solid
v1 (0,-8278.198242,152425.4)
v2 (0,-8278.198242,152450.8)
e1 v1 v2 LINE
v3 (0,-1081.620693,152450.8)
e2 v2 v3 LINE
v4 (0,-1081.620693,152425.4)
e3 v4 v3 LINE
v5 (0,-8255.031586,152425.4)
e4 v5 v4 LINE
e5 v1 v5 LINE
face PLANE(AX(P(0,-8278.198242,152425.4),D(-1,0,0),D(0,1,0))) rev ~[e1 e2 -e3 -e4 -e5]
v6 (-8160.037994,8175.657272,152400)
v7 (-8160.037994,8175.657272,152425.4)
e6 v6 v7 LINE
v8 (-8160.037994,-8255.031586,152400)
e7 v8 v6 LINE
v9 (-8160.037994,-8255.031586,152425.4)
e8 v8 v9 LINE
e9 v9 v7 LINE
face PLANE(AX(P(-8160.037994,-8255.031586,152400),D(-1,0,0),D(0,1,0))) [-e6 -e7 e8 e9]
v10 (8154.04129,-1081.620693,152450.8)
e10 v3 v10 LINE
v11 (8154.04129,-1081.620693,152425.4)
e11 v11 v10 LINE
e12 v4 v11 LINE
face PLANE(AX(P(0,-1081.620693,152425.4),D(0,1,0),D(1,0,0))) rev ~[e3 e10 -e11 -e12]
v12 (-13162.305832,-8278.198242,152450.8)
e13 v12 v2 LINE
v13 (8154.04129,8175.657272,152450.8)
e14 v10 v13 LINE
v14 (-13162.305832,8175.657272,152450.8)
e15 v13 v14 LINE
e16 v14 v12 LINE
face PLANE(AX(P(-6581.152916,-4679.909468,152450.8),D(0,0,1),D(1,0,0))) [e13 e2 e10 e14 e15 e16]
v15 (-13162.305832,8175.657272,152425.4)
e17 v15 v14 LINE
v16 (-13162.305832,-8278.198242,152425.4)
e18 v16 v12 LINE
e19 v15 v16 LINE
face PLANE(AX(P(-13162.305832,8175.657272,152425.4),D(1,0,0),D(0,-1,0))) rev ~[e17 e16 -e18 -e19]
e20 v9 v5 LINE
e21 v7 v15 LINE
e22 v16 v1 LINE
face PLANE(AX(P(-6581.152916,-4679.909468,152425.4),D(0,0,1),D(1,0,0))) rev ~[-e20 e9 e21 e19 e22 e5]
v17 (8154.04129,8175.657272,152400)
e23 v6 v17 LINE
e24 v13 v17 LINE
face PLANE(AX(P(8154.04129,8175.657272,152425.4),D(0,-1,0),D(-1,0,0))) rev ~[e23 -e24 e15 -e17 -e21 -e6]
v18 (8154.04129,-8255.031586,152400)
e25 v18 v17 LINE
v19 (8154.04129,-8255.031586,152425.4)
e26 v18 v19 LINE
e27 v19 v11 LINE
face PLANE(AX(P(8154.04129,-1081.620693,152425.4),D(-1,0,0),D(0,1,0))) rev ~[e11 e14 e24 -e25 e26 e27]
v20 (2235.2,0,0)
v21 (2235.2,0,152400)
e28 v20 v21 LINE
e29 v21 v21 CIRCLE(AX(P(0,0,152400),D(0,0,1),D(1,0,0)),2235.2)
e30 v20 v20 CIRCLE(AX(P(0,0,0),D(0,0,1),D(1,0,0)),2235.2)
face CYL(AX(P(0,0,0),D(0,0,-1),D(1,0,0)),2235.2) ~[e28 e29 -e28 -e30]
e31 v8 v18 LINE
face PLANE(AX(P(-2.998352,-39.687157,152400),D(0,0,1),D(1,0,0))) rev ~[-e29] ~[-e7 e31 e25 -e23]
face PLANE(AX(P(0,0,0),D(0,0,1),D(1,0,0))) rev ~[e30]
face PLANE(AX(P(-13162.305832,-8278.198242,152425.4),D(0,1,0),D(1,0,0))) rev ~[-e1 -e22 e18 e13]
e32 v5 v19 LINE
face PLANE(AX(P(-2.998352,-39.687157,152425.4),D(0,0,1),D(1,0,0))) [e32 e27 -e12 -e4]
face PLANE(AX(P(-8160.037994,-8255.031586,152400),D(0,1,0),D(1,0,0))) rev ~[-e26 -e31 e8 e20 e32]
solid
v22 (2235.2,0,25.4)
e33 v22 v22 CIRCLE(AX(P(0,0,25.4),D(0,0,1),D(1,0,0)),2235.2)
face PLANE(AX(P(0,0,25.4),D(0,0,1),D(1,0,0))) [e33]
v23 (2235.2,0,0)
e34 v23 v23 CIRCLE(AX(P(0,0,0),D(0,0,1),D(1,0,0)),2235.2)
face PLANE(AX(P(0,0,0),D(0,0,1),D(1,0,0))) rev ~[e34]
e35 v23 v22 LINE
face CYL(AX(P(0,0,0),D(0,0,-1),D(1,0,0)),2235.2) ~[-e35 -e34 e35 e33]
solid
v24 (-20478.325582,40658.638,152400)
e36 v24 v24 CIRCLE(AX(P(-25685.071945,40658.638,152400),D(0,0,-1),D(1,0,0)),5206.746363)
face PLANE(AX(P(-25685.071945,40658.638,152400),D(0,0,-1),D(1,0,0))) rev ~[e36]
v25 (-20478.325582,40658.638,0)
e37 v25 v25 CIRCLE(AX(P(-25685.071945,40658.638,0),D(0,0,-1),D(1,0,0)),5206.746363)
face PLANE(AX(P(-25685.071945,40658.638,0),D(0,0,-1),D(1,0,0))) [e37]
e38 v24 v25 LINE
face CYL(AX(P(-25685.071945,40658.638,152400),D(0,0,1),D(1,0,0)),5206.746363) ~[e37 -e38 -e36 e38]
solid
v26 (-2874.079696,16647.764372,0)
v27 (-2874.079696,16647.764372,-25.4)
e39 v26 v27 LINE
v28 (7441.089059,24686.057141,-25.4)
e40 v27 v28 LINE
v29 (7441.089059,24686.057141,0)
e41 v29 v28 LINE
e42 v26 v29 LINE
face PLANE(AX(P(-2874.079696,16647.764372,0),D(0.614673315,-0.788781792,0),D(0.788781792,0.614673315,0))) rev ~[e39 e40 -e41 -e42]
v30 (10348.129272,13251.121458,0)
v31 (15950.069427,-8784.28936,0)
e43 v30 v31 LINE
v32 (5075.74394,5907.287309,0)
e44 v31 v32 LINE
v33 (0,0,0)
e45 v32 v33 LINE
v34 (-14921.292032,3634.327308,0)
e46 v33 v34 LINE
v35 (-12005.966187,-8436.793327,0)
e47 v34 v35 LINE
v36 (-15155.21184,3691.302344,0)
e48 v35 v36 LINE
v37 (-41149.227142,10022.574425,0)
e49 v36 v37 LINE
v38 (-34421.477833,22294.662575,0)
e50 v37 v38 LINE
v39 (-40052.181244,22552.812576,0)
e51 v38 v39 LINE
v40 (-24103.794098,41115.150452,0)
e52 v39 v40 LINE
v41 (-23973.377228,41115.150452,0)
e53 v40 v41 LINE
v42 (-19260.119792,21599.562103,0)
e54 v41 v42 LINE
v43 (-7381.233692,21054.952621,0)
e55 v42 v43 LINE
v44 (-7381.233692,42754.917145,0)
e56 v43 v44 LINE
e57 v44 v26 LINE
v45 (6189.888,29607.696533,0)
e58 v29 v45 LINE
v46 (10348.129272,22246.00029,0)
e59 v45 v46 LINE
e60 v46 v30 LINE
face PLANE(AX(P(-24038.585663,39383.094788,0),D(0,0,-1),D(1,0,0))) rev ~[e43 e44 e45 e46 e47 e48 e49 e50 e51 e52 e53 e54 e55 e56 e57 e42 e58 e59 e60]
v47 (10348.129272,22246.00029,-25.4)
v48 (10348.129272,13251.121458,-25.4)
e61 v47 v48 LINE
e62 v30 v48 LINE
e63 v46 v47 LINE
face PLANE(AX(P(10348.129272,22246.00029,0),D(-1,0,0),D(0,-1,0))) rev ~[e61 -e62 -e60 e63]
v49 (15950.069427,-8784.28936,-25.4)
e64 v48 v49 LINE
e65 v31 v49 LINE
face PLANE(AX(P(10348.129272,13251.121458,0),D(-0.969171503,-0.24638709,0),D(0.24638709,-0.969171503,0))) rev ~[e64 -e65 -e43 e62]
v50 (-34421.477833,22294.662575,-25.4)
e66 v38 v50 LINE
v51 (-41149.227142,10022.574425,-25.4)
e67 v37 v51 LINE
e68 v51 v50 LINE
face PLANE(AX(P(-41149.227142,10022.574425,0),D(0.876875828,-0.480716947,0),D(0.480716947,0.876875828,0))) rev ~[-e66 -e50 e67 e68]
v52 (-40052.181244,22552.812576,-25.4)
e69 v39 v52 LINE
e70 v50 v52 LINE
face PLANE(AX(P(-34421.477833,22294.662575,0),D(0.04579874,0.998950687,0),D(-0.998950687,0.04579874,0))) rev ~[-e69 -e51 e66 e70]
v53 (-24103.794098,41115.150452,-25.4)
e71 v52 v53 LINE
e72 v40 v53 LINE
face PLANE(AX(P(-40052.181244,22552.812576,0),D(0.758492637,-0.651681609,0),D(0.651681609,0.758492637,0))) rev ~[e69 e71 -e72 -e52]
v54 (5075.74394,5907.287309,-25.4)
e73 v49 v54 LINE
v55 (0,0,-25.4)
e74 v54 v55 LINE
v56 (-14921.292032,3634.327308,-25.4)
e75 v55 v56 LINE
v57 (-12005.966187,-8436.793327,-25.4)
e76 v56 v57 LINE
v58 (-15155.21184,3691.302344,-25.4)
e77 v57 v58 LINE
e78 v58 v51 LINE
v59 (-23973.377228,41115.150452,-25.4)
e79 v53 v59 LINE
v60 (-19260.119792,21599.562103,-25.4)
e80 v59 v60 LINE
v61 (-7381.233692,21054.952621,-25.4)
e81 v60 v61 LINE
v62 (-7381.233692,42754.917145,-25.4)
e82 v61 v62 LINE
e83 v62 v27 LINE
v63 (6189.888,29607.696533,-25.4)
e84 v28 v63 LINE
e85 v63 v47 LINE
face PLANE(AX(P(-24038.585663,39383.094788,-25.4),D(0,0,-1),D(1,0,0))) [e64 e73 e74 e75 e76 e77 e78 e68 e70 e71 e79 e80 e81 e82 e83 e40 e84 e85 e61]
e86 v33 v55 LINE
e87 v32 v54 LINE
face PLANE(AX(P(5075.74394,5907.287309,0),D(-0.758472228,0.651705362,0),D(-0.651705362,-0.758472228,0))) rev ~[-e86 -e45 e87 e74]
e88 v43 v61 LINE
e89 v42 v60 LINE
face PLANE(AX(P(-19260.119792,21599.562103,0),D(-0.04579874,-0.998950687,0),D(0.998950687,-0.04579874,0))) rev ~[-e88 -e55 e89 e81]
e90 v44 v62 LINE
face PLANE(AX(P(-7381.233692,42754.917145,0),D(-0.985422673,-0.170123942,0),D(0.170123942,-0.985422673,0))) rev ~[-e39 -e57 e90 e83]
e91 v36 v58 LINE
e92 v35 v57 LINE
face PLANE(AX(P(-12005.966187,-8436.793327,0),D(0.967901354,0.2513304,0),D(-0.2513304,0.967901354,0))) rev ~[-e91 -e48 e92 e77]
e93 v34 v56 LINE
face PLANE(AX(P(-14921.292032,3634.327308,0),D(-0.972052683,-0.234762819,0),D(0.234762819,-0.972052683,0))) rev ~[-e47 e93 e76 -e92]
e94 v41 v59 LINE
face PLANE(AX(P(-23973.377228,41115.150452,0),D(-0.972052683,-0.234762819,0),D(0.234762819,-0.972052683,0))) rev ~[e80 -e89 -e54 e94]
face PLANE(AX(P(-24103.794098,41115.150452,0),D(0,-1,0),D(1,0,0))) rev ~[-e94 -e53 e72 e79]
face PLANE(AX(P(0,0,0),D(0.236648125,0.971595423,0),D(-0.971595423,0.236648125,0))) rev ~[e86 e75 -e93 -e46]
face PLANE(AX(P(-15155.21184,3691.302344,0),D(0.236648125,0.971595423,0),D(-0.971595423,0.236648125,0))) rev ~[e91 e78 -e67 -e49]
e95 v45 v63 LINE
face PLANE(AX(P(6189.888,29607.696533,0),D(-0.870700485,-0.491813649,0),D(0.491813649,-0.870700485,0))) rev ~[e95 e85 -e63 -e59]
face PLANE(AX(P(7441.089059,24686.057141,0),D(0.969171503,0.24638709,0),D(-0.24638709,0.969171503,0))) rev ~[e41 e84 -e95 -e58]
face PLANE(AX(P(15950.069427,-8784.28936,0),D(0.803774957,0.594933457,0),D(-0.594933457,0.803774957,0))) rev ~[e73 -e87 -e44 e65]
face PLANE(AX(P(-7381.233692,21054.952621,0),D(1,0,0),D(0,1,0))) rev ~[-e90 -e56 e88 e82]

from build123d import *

# Parameters (mm, degrees)
F0_R      = 2235.2
F1_DEPTH  = 152400
F2_W      = 16314.079284668
F2_H      = 16430.6888580322
F3_DEPTH  = 25.4
F4_W      = 13162.3058319092
F4_H      = 7196.5775489807
F5_DEPTH  = 25.4
F6_R      = 5206.746363133
F7_DEPTH  = 152400
F8_W      = 130.4168701172
F8_H      = 3464.111328125
F9_DEPTH  = 25.4
F10_DEPTH = 25.4


with BuildPart() as f1:
    # F0 (on Top) → F1 (new body)
    with BuildSketch(Plane.XY):
        Circle(F0_R)
    extrude(amount=F1_DEPTH)

    # F2 (on face) → F3 (join)
    with BuildSketch(Plane.XY.offset(152400)):
        with Locations((-2.9983520508, -39.6871566772)):
            Rectangle(F2_W, F2_H)
    extrude(amount=F3_DEPTH)

    # F4 (on face) → F5 (join)
    with BuildSketch(Plane.XY.offset(152425.4)):
        with Locations((-6581.1529159546, -4679.9094676971)):
            Rectangle(F4_W, F4_H)
        Polygon((-13162.3058319092, -1081.6206932068), (0, -1081.6206932068), (8154.0412902832, -1081.6206932068), (8154.0412902832, 8175.6572723389), (-13162.3058319092, 8175.6572723389), align=None)
    extrude(amount=F5_DEPTH)


with BuildPart() as f7:
    # F6 (on face) → F7 (new body, through all)
    with BuildSketch(Plane(origin=(0, 0, 152400), x_dir=(1, 0, 0), z_dir=(0, 0, -1))):
        with Locations((-25685.0719451904, -40658.6380004883)):
            Circle(F6_R)
    extrude(amount=F7_DEPTH)


with BuildPart() as f9:
    # F8 (on face) → F9 (new body)
    with BuildSketch(Plane(origin=(0, 0, 0), x_dir=(1, 0, 0), z_dir=(0, 0, -1))):
        with Locations((-24038.5856628418, -39383.0947875977)):
            Rectangle(F8_W, F8_H)
        Polygon((-34421.4778333763, -22294.6625748956), (-24103.7940979004, -41115.1504516602), (-24103.7940979004, -37651.0391235352), (-23973.3772277832, -37651.0391235352), (-19811.9348288427, -21624.8610825982), align=None)
        Polygon((-40052.1812438965, -22552.8125762939), (-24103.7940979004, -41115.1504516602), (-34421.4778333763, -22294.6625748956), align=None)
        Polygon((-23973.3772277832, -37651.0391235352), (-23973.3772277832, -41115.1504516602), (-19260.1197917863, -21599.5621026658), (-19811.9348288427, -21624.8610825982), align=None)
        Polygon((-41149.227142334, -10022.5744247436), (-34421.4778333763, -22294.6625748956), (-19811.9348288427, -21624.8610825982), (-16222.995959886, -7803.457881972), align=None)
        Polygon((-15921.7109515854, -7776.6352732464), (-19260.1197917863, -21599.5621026658), (-7381.2336921692, -21054.95262146), (-2301.1527002977, -6564.0329381408), align=None)
        Polygon((-19811.9348288427, -21624.8610825982), (-19260.1197917863, -21599.5621026658), (-15921.7109515854, -7776.6352732464), (-16222.995959886, -7803.457881972), align=None)
        Polygon((-15155.2118404192, -3691.3023437344), (-41149.227142334, -10022.5744247437), (-16222.995959886, -7803.457881972), align=None)
        Polygon((-2301.1527002977, -6564.0329381408), (-7381.2336921692, -21054.95262146), (-7381.2336921692, -42754.9171447754), (-2874.0796962277, -16647.7643717013), (-1114.9874071605, -6458.4317742426), align=None)
        Polygon((-16222.995959886, -7803.457881972), (-15921.7109515854, -7776.6352732464), (-14921.2920315378, -3634.3273078285), (-15155.2118404192, -3691.3023437344), align=None)
        Polygon((-14921.2920315378, -3634.3273078285), (-15921.7109515854, -7776.6352732464), (-2301.1527002977, -6564.0329381408), (0, 0), align=None)
        Polygon((-12005.9661865234, 8436.7933273315), (-15155.2118404192, -3691.3023437344), (-14921.2920315378, -3634.3273078285), align=None)
        Polygon((0, 0), (-2301.1527002977, -6564.0329381408), (-1114.9874071605, -6458.4317742426), align=None)
        Polygon((5075.7439402199, -5907.2873094308), (-2874.0796962277, -16647.7643717013), (10348.1292724609, -12262.6476287842), (10348.1292724609, -13251.1214584158), (15950.0694274902, 8784.2893600464), align=None)
        Polygon((-1114.9874071605, -6458.4317742426), (-2874.0796962277, -16647.7643717013), (5075.7439402199, -5907.2873094308), align=None)
        Polygon((10348.1292724609, -12262.6476287842), (-2874.0796962277, -16647.7643717013), (7441.0890589714, -24686.057140926), (10348.1292724609, -13251.1214584158), align=None)
        Polygon((5075.7439402199, -5907.2873094308), (0, 0), (-1114.9874071605, -6458.4317742426), align=None)
        Polygon((10348.1292724609, -13251.1214584158), (7441.0890589715, -24686.057140926), (6189.8880004883, -29607.6965332031), (10348.1292724609, -22246.000289917), (10348.1292724609, -14536.7050170898), align=None)
    extrude(amount=F9_DEPTH)


with BuildPart() as f10:
    # F0 (on Top) → F10 (new body)
    with BuildSketch(Plane.XY):
        Circle(F0_R)
    extrude(amount=F10_DEPTH)


solid = Compound([f1.part, f7.part, f9.part, f10.part])
